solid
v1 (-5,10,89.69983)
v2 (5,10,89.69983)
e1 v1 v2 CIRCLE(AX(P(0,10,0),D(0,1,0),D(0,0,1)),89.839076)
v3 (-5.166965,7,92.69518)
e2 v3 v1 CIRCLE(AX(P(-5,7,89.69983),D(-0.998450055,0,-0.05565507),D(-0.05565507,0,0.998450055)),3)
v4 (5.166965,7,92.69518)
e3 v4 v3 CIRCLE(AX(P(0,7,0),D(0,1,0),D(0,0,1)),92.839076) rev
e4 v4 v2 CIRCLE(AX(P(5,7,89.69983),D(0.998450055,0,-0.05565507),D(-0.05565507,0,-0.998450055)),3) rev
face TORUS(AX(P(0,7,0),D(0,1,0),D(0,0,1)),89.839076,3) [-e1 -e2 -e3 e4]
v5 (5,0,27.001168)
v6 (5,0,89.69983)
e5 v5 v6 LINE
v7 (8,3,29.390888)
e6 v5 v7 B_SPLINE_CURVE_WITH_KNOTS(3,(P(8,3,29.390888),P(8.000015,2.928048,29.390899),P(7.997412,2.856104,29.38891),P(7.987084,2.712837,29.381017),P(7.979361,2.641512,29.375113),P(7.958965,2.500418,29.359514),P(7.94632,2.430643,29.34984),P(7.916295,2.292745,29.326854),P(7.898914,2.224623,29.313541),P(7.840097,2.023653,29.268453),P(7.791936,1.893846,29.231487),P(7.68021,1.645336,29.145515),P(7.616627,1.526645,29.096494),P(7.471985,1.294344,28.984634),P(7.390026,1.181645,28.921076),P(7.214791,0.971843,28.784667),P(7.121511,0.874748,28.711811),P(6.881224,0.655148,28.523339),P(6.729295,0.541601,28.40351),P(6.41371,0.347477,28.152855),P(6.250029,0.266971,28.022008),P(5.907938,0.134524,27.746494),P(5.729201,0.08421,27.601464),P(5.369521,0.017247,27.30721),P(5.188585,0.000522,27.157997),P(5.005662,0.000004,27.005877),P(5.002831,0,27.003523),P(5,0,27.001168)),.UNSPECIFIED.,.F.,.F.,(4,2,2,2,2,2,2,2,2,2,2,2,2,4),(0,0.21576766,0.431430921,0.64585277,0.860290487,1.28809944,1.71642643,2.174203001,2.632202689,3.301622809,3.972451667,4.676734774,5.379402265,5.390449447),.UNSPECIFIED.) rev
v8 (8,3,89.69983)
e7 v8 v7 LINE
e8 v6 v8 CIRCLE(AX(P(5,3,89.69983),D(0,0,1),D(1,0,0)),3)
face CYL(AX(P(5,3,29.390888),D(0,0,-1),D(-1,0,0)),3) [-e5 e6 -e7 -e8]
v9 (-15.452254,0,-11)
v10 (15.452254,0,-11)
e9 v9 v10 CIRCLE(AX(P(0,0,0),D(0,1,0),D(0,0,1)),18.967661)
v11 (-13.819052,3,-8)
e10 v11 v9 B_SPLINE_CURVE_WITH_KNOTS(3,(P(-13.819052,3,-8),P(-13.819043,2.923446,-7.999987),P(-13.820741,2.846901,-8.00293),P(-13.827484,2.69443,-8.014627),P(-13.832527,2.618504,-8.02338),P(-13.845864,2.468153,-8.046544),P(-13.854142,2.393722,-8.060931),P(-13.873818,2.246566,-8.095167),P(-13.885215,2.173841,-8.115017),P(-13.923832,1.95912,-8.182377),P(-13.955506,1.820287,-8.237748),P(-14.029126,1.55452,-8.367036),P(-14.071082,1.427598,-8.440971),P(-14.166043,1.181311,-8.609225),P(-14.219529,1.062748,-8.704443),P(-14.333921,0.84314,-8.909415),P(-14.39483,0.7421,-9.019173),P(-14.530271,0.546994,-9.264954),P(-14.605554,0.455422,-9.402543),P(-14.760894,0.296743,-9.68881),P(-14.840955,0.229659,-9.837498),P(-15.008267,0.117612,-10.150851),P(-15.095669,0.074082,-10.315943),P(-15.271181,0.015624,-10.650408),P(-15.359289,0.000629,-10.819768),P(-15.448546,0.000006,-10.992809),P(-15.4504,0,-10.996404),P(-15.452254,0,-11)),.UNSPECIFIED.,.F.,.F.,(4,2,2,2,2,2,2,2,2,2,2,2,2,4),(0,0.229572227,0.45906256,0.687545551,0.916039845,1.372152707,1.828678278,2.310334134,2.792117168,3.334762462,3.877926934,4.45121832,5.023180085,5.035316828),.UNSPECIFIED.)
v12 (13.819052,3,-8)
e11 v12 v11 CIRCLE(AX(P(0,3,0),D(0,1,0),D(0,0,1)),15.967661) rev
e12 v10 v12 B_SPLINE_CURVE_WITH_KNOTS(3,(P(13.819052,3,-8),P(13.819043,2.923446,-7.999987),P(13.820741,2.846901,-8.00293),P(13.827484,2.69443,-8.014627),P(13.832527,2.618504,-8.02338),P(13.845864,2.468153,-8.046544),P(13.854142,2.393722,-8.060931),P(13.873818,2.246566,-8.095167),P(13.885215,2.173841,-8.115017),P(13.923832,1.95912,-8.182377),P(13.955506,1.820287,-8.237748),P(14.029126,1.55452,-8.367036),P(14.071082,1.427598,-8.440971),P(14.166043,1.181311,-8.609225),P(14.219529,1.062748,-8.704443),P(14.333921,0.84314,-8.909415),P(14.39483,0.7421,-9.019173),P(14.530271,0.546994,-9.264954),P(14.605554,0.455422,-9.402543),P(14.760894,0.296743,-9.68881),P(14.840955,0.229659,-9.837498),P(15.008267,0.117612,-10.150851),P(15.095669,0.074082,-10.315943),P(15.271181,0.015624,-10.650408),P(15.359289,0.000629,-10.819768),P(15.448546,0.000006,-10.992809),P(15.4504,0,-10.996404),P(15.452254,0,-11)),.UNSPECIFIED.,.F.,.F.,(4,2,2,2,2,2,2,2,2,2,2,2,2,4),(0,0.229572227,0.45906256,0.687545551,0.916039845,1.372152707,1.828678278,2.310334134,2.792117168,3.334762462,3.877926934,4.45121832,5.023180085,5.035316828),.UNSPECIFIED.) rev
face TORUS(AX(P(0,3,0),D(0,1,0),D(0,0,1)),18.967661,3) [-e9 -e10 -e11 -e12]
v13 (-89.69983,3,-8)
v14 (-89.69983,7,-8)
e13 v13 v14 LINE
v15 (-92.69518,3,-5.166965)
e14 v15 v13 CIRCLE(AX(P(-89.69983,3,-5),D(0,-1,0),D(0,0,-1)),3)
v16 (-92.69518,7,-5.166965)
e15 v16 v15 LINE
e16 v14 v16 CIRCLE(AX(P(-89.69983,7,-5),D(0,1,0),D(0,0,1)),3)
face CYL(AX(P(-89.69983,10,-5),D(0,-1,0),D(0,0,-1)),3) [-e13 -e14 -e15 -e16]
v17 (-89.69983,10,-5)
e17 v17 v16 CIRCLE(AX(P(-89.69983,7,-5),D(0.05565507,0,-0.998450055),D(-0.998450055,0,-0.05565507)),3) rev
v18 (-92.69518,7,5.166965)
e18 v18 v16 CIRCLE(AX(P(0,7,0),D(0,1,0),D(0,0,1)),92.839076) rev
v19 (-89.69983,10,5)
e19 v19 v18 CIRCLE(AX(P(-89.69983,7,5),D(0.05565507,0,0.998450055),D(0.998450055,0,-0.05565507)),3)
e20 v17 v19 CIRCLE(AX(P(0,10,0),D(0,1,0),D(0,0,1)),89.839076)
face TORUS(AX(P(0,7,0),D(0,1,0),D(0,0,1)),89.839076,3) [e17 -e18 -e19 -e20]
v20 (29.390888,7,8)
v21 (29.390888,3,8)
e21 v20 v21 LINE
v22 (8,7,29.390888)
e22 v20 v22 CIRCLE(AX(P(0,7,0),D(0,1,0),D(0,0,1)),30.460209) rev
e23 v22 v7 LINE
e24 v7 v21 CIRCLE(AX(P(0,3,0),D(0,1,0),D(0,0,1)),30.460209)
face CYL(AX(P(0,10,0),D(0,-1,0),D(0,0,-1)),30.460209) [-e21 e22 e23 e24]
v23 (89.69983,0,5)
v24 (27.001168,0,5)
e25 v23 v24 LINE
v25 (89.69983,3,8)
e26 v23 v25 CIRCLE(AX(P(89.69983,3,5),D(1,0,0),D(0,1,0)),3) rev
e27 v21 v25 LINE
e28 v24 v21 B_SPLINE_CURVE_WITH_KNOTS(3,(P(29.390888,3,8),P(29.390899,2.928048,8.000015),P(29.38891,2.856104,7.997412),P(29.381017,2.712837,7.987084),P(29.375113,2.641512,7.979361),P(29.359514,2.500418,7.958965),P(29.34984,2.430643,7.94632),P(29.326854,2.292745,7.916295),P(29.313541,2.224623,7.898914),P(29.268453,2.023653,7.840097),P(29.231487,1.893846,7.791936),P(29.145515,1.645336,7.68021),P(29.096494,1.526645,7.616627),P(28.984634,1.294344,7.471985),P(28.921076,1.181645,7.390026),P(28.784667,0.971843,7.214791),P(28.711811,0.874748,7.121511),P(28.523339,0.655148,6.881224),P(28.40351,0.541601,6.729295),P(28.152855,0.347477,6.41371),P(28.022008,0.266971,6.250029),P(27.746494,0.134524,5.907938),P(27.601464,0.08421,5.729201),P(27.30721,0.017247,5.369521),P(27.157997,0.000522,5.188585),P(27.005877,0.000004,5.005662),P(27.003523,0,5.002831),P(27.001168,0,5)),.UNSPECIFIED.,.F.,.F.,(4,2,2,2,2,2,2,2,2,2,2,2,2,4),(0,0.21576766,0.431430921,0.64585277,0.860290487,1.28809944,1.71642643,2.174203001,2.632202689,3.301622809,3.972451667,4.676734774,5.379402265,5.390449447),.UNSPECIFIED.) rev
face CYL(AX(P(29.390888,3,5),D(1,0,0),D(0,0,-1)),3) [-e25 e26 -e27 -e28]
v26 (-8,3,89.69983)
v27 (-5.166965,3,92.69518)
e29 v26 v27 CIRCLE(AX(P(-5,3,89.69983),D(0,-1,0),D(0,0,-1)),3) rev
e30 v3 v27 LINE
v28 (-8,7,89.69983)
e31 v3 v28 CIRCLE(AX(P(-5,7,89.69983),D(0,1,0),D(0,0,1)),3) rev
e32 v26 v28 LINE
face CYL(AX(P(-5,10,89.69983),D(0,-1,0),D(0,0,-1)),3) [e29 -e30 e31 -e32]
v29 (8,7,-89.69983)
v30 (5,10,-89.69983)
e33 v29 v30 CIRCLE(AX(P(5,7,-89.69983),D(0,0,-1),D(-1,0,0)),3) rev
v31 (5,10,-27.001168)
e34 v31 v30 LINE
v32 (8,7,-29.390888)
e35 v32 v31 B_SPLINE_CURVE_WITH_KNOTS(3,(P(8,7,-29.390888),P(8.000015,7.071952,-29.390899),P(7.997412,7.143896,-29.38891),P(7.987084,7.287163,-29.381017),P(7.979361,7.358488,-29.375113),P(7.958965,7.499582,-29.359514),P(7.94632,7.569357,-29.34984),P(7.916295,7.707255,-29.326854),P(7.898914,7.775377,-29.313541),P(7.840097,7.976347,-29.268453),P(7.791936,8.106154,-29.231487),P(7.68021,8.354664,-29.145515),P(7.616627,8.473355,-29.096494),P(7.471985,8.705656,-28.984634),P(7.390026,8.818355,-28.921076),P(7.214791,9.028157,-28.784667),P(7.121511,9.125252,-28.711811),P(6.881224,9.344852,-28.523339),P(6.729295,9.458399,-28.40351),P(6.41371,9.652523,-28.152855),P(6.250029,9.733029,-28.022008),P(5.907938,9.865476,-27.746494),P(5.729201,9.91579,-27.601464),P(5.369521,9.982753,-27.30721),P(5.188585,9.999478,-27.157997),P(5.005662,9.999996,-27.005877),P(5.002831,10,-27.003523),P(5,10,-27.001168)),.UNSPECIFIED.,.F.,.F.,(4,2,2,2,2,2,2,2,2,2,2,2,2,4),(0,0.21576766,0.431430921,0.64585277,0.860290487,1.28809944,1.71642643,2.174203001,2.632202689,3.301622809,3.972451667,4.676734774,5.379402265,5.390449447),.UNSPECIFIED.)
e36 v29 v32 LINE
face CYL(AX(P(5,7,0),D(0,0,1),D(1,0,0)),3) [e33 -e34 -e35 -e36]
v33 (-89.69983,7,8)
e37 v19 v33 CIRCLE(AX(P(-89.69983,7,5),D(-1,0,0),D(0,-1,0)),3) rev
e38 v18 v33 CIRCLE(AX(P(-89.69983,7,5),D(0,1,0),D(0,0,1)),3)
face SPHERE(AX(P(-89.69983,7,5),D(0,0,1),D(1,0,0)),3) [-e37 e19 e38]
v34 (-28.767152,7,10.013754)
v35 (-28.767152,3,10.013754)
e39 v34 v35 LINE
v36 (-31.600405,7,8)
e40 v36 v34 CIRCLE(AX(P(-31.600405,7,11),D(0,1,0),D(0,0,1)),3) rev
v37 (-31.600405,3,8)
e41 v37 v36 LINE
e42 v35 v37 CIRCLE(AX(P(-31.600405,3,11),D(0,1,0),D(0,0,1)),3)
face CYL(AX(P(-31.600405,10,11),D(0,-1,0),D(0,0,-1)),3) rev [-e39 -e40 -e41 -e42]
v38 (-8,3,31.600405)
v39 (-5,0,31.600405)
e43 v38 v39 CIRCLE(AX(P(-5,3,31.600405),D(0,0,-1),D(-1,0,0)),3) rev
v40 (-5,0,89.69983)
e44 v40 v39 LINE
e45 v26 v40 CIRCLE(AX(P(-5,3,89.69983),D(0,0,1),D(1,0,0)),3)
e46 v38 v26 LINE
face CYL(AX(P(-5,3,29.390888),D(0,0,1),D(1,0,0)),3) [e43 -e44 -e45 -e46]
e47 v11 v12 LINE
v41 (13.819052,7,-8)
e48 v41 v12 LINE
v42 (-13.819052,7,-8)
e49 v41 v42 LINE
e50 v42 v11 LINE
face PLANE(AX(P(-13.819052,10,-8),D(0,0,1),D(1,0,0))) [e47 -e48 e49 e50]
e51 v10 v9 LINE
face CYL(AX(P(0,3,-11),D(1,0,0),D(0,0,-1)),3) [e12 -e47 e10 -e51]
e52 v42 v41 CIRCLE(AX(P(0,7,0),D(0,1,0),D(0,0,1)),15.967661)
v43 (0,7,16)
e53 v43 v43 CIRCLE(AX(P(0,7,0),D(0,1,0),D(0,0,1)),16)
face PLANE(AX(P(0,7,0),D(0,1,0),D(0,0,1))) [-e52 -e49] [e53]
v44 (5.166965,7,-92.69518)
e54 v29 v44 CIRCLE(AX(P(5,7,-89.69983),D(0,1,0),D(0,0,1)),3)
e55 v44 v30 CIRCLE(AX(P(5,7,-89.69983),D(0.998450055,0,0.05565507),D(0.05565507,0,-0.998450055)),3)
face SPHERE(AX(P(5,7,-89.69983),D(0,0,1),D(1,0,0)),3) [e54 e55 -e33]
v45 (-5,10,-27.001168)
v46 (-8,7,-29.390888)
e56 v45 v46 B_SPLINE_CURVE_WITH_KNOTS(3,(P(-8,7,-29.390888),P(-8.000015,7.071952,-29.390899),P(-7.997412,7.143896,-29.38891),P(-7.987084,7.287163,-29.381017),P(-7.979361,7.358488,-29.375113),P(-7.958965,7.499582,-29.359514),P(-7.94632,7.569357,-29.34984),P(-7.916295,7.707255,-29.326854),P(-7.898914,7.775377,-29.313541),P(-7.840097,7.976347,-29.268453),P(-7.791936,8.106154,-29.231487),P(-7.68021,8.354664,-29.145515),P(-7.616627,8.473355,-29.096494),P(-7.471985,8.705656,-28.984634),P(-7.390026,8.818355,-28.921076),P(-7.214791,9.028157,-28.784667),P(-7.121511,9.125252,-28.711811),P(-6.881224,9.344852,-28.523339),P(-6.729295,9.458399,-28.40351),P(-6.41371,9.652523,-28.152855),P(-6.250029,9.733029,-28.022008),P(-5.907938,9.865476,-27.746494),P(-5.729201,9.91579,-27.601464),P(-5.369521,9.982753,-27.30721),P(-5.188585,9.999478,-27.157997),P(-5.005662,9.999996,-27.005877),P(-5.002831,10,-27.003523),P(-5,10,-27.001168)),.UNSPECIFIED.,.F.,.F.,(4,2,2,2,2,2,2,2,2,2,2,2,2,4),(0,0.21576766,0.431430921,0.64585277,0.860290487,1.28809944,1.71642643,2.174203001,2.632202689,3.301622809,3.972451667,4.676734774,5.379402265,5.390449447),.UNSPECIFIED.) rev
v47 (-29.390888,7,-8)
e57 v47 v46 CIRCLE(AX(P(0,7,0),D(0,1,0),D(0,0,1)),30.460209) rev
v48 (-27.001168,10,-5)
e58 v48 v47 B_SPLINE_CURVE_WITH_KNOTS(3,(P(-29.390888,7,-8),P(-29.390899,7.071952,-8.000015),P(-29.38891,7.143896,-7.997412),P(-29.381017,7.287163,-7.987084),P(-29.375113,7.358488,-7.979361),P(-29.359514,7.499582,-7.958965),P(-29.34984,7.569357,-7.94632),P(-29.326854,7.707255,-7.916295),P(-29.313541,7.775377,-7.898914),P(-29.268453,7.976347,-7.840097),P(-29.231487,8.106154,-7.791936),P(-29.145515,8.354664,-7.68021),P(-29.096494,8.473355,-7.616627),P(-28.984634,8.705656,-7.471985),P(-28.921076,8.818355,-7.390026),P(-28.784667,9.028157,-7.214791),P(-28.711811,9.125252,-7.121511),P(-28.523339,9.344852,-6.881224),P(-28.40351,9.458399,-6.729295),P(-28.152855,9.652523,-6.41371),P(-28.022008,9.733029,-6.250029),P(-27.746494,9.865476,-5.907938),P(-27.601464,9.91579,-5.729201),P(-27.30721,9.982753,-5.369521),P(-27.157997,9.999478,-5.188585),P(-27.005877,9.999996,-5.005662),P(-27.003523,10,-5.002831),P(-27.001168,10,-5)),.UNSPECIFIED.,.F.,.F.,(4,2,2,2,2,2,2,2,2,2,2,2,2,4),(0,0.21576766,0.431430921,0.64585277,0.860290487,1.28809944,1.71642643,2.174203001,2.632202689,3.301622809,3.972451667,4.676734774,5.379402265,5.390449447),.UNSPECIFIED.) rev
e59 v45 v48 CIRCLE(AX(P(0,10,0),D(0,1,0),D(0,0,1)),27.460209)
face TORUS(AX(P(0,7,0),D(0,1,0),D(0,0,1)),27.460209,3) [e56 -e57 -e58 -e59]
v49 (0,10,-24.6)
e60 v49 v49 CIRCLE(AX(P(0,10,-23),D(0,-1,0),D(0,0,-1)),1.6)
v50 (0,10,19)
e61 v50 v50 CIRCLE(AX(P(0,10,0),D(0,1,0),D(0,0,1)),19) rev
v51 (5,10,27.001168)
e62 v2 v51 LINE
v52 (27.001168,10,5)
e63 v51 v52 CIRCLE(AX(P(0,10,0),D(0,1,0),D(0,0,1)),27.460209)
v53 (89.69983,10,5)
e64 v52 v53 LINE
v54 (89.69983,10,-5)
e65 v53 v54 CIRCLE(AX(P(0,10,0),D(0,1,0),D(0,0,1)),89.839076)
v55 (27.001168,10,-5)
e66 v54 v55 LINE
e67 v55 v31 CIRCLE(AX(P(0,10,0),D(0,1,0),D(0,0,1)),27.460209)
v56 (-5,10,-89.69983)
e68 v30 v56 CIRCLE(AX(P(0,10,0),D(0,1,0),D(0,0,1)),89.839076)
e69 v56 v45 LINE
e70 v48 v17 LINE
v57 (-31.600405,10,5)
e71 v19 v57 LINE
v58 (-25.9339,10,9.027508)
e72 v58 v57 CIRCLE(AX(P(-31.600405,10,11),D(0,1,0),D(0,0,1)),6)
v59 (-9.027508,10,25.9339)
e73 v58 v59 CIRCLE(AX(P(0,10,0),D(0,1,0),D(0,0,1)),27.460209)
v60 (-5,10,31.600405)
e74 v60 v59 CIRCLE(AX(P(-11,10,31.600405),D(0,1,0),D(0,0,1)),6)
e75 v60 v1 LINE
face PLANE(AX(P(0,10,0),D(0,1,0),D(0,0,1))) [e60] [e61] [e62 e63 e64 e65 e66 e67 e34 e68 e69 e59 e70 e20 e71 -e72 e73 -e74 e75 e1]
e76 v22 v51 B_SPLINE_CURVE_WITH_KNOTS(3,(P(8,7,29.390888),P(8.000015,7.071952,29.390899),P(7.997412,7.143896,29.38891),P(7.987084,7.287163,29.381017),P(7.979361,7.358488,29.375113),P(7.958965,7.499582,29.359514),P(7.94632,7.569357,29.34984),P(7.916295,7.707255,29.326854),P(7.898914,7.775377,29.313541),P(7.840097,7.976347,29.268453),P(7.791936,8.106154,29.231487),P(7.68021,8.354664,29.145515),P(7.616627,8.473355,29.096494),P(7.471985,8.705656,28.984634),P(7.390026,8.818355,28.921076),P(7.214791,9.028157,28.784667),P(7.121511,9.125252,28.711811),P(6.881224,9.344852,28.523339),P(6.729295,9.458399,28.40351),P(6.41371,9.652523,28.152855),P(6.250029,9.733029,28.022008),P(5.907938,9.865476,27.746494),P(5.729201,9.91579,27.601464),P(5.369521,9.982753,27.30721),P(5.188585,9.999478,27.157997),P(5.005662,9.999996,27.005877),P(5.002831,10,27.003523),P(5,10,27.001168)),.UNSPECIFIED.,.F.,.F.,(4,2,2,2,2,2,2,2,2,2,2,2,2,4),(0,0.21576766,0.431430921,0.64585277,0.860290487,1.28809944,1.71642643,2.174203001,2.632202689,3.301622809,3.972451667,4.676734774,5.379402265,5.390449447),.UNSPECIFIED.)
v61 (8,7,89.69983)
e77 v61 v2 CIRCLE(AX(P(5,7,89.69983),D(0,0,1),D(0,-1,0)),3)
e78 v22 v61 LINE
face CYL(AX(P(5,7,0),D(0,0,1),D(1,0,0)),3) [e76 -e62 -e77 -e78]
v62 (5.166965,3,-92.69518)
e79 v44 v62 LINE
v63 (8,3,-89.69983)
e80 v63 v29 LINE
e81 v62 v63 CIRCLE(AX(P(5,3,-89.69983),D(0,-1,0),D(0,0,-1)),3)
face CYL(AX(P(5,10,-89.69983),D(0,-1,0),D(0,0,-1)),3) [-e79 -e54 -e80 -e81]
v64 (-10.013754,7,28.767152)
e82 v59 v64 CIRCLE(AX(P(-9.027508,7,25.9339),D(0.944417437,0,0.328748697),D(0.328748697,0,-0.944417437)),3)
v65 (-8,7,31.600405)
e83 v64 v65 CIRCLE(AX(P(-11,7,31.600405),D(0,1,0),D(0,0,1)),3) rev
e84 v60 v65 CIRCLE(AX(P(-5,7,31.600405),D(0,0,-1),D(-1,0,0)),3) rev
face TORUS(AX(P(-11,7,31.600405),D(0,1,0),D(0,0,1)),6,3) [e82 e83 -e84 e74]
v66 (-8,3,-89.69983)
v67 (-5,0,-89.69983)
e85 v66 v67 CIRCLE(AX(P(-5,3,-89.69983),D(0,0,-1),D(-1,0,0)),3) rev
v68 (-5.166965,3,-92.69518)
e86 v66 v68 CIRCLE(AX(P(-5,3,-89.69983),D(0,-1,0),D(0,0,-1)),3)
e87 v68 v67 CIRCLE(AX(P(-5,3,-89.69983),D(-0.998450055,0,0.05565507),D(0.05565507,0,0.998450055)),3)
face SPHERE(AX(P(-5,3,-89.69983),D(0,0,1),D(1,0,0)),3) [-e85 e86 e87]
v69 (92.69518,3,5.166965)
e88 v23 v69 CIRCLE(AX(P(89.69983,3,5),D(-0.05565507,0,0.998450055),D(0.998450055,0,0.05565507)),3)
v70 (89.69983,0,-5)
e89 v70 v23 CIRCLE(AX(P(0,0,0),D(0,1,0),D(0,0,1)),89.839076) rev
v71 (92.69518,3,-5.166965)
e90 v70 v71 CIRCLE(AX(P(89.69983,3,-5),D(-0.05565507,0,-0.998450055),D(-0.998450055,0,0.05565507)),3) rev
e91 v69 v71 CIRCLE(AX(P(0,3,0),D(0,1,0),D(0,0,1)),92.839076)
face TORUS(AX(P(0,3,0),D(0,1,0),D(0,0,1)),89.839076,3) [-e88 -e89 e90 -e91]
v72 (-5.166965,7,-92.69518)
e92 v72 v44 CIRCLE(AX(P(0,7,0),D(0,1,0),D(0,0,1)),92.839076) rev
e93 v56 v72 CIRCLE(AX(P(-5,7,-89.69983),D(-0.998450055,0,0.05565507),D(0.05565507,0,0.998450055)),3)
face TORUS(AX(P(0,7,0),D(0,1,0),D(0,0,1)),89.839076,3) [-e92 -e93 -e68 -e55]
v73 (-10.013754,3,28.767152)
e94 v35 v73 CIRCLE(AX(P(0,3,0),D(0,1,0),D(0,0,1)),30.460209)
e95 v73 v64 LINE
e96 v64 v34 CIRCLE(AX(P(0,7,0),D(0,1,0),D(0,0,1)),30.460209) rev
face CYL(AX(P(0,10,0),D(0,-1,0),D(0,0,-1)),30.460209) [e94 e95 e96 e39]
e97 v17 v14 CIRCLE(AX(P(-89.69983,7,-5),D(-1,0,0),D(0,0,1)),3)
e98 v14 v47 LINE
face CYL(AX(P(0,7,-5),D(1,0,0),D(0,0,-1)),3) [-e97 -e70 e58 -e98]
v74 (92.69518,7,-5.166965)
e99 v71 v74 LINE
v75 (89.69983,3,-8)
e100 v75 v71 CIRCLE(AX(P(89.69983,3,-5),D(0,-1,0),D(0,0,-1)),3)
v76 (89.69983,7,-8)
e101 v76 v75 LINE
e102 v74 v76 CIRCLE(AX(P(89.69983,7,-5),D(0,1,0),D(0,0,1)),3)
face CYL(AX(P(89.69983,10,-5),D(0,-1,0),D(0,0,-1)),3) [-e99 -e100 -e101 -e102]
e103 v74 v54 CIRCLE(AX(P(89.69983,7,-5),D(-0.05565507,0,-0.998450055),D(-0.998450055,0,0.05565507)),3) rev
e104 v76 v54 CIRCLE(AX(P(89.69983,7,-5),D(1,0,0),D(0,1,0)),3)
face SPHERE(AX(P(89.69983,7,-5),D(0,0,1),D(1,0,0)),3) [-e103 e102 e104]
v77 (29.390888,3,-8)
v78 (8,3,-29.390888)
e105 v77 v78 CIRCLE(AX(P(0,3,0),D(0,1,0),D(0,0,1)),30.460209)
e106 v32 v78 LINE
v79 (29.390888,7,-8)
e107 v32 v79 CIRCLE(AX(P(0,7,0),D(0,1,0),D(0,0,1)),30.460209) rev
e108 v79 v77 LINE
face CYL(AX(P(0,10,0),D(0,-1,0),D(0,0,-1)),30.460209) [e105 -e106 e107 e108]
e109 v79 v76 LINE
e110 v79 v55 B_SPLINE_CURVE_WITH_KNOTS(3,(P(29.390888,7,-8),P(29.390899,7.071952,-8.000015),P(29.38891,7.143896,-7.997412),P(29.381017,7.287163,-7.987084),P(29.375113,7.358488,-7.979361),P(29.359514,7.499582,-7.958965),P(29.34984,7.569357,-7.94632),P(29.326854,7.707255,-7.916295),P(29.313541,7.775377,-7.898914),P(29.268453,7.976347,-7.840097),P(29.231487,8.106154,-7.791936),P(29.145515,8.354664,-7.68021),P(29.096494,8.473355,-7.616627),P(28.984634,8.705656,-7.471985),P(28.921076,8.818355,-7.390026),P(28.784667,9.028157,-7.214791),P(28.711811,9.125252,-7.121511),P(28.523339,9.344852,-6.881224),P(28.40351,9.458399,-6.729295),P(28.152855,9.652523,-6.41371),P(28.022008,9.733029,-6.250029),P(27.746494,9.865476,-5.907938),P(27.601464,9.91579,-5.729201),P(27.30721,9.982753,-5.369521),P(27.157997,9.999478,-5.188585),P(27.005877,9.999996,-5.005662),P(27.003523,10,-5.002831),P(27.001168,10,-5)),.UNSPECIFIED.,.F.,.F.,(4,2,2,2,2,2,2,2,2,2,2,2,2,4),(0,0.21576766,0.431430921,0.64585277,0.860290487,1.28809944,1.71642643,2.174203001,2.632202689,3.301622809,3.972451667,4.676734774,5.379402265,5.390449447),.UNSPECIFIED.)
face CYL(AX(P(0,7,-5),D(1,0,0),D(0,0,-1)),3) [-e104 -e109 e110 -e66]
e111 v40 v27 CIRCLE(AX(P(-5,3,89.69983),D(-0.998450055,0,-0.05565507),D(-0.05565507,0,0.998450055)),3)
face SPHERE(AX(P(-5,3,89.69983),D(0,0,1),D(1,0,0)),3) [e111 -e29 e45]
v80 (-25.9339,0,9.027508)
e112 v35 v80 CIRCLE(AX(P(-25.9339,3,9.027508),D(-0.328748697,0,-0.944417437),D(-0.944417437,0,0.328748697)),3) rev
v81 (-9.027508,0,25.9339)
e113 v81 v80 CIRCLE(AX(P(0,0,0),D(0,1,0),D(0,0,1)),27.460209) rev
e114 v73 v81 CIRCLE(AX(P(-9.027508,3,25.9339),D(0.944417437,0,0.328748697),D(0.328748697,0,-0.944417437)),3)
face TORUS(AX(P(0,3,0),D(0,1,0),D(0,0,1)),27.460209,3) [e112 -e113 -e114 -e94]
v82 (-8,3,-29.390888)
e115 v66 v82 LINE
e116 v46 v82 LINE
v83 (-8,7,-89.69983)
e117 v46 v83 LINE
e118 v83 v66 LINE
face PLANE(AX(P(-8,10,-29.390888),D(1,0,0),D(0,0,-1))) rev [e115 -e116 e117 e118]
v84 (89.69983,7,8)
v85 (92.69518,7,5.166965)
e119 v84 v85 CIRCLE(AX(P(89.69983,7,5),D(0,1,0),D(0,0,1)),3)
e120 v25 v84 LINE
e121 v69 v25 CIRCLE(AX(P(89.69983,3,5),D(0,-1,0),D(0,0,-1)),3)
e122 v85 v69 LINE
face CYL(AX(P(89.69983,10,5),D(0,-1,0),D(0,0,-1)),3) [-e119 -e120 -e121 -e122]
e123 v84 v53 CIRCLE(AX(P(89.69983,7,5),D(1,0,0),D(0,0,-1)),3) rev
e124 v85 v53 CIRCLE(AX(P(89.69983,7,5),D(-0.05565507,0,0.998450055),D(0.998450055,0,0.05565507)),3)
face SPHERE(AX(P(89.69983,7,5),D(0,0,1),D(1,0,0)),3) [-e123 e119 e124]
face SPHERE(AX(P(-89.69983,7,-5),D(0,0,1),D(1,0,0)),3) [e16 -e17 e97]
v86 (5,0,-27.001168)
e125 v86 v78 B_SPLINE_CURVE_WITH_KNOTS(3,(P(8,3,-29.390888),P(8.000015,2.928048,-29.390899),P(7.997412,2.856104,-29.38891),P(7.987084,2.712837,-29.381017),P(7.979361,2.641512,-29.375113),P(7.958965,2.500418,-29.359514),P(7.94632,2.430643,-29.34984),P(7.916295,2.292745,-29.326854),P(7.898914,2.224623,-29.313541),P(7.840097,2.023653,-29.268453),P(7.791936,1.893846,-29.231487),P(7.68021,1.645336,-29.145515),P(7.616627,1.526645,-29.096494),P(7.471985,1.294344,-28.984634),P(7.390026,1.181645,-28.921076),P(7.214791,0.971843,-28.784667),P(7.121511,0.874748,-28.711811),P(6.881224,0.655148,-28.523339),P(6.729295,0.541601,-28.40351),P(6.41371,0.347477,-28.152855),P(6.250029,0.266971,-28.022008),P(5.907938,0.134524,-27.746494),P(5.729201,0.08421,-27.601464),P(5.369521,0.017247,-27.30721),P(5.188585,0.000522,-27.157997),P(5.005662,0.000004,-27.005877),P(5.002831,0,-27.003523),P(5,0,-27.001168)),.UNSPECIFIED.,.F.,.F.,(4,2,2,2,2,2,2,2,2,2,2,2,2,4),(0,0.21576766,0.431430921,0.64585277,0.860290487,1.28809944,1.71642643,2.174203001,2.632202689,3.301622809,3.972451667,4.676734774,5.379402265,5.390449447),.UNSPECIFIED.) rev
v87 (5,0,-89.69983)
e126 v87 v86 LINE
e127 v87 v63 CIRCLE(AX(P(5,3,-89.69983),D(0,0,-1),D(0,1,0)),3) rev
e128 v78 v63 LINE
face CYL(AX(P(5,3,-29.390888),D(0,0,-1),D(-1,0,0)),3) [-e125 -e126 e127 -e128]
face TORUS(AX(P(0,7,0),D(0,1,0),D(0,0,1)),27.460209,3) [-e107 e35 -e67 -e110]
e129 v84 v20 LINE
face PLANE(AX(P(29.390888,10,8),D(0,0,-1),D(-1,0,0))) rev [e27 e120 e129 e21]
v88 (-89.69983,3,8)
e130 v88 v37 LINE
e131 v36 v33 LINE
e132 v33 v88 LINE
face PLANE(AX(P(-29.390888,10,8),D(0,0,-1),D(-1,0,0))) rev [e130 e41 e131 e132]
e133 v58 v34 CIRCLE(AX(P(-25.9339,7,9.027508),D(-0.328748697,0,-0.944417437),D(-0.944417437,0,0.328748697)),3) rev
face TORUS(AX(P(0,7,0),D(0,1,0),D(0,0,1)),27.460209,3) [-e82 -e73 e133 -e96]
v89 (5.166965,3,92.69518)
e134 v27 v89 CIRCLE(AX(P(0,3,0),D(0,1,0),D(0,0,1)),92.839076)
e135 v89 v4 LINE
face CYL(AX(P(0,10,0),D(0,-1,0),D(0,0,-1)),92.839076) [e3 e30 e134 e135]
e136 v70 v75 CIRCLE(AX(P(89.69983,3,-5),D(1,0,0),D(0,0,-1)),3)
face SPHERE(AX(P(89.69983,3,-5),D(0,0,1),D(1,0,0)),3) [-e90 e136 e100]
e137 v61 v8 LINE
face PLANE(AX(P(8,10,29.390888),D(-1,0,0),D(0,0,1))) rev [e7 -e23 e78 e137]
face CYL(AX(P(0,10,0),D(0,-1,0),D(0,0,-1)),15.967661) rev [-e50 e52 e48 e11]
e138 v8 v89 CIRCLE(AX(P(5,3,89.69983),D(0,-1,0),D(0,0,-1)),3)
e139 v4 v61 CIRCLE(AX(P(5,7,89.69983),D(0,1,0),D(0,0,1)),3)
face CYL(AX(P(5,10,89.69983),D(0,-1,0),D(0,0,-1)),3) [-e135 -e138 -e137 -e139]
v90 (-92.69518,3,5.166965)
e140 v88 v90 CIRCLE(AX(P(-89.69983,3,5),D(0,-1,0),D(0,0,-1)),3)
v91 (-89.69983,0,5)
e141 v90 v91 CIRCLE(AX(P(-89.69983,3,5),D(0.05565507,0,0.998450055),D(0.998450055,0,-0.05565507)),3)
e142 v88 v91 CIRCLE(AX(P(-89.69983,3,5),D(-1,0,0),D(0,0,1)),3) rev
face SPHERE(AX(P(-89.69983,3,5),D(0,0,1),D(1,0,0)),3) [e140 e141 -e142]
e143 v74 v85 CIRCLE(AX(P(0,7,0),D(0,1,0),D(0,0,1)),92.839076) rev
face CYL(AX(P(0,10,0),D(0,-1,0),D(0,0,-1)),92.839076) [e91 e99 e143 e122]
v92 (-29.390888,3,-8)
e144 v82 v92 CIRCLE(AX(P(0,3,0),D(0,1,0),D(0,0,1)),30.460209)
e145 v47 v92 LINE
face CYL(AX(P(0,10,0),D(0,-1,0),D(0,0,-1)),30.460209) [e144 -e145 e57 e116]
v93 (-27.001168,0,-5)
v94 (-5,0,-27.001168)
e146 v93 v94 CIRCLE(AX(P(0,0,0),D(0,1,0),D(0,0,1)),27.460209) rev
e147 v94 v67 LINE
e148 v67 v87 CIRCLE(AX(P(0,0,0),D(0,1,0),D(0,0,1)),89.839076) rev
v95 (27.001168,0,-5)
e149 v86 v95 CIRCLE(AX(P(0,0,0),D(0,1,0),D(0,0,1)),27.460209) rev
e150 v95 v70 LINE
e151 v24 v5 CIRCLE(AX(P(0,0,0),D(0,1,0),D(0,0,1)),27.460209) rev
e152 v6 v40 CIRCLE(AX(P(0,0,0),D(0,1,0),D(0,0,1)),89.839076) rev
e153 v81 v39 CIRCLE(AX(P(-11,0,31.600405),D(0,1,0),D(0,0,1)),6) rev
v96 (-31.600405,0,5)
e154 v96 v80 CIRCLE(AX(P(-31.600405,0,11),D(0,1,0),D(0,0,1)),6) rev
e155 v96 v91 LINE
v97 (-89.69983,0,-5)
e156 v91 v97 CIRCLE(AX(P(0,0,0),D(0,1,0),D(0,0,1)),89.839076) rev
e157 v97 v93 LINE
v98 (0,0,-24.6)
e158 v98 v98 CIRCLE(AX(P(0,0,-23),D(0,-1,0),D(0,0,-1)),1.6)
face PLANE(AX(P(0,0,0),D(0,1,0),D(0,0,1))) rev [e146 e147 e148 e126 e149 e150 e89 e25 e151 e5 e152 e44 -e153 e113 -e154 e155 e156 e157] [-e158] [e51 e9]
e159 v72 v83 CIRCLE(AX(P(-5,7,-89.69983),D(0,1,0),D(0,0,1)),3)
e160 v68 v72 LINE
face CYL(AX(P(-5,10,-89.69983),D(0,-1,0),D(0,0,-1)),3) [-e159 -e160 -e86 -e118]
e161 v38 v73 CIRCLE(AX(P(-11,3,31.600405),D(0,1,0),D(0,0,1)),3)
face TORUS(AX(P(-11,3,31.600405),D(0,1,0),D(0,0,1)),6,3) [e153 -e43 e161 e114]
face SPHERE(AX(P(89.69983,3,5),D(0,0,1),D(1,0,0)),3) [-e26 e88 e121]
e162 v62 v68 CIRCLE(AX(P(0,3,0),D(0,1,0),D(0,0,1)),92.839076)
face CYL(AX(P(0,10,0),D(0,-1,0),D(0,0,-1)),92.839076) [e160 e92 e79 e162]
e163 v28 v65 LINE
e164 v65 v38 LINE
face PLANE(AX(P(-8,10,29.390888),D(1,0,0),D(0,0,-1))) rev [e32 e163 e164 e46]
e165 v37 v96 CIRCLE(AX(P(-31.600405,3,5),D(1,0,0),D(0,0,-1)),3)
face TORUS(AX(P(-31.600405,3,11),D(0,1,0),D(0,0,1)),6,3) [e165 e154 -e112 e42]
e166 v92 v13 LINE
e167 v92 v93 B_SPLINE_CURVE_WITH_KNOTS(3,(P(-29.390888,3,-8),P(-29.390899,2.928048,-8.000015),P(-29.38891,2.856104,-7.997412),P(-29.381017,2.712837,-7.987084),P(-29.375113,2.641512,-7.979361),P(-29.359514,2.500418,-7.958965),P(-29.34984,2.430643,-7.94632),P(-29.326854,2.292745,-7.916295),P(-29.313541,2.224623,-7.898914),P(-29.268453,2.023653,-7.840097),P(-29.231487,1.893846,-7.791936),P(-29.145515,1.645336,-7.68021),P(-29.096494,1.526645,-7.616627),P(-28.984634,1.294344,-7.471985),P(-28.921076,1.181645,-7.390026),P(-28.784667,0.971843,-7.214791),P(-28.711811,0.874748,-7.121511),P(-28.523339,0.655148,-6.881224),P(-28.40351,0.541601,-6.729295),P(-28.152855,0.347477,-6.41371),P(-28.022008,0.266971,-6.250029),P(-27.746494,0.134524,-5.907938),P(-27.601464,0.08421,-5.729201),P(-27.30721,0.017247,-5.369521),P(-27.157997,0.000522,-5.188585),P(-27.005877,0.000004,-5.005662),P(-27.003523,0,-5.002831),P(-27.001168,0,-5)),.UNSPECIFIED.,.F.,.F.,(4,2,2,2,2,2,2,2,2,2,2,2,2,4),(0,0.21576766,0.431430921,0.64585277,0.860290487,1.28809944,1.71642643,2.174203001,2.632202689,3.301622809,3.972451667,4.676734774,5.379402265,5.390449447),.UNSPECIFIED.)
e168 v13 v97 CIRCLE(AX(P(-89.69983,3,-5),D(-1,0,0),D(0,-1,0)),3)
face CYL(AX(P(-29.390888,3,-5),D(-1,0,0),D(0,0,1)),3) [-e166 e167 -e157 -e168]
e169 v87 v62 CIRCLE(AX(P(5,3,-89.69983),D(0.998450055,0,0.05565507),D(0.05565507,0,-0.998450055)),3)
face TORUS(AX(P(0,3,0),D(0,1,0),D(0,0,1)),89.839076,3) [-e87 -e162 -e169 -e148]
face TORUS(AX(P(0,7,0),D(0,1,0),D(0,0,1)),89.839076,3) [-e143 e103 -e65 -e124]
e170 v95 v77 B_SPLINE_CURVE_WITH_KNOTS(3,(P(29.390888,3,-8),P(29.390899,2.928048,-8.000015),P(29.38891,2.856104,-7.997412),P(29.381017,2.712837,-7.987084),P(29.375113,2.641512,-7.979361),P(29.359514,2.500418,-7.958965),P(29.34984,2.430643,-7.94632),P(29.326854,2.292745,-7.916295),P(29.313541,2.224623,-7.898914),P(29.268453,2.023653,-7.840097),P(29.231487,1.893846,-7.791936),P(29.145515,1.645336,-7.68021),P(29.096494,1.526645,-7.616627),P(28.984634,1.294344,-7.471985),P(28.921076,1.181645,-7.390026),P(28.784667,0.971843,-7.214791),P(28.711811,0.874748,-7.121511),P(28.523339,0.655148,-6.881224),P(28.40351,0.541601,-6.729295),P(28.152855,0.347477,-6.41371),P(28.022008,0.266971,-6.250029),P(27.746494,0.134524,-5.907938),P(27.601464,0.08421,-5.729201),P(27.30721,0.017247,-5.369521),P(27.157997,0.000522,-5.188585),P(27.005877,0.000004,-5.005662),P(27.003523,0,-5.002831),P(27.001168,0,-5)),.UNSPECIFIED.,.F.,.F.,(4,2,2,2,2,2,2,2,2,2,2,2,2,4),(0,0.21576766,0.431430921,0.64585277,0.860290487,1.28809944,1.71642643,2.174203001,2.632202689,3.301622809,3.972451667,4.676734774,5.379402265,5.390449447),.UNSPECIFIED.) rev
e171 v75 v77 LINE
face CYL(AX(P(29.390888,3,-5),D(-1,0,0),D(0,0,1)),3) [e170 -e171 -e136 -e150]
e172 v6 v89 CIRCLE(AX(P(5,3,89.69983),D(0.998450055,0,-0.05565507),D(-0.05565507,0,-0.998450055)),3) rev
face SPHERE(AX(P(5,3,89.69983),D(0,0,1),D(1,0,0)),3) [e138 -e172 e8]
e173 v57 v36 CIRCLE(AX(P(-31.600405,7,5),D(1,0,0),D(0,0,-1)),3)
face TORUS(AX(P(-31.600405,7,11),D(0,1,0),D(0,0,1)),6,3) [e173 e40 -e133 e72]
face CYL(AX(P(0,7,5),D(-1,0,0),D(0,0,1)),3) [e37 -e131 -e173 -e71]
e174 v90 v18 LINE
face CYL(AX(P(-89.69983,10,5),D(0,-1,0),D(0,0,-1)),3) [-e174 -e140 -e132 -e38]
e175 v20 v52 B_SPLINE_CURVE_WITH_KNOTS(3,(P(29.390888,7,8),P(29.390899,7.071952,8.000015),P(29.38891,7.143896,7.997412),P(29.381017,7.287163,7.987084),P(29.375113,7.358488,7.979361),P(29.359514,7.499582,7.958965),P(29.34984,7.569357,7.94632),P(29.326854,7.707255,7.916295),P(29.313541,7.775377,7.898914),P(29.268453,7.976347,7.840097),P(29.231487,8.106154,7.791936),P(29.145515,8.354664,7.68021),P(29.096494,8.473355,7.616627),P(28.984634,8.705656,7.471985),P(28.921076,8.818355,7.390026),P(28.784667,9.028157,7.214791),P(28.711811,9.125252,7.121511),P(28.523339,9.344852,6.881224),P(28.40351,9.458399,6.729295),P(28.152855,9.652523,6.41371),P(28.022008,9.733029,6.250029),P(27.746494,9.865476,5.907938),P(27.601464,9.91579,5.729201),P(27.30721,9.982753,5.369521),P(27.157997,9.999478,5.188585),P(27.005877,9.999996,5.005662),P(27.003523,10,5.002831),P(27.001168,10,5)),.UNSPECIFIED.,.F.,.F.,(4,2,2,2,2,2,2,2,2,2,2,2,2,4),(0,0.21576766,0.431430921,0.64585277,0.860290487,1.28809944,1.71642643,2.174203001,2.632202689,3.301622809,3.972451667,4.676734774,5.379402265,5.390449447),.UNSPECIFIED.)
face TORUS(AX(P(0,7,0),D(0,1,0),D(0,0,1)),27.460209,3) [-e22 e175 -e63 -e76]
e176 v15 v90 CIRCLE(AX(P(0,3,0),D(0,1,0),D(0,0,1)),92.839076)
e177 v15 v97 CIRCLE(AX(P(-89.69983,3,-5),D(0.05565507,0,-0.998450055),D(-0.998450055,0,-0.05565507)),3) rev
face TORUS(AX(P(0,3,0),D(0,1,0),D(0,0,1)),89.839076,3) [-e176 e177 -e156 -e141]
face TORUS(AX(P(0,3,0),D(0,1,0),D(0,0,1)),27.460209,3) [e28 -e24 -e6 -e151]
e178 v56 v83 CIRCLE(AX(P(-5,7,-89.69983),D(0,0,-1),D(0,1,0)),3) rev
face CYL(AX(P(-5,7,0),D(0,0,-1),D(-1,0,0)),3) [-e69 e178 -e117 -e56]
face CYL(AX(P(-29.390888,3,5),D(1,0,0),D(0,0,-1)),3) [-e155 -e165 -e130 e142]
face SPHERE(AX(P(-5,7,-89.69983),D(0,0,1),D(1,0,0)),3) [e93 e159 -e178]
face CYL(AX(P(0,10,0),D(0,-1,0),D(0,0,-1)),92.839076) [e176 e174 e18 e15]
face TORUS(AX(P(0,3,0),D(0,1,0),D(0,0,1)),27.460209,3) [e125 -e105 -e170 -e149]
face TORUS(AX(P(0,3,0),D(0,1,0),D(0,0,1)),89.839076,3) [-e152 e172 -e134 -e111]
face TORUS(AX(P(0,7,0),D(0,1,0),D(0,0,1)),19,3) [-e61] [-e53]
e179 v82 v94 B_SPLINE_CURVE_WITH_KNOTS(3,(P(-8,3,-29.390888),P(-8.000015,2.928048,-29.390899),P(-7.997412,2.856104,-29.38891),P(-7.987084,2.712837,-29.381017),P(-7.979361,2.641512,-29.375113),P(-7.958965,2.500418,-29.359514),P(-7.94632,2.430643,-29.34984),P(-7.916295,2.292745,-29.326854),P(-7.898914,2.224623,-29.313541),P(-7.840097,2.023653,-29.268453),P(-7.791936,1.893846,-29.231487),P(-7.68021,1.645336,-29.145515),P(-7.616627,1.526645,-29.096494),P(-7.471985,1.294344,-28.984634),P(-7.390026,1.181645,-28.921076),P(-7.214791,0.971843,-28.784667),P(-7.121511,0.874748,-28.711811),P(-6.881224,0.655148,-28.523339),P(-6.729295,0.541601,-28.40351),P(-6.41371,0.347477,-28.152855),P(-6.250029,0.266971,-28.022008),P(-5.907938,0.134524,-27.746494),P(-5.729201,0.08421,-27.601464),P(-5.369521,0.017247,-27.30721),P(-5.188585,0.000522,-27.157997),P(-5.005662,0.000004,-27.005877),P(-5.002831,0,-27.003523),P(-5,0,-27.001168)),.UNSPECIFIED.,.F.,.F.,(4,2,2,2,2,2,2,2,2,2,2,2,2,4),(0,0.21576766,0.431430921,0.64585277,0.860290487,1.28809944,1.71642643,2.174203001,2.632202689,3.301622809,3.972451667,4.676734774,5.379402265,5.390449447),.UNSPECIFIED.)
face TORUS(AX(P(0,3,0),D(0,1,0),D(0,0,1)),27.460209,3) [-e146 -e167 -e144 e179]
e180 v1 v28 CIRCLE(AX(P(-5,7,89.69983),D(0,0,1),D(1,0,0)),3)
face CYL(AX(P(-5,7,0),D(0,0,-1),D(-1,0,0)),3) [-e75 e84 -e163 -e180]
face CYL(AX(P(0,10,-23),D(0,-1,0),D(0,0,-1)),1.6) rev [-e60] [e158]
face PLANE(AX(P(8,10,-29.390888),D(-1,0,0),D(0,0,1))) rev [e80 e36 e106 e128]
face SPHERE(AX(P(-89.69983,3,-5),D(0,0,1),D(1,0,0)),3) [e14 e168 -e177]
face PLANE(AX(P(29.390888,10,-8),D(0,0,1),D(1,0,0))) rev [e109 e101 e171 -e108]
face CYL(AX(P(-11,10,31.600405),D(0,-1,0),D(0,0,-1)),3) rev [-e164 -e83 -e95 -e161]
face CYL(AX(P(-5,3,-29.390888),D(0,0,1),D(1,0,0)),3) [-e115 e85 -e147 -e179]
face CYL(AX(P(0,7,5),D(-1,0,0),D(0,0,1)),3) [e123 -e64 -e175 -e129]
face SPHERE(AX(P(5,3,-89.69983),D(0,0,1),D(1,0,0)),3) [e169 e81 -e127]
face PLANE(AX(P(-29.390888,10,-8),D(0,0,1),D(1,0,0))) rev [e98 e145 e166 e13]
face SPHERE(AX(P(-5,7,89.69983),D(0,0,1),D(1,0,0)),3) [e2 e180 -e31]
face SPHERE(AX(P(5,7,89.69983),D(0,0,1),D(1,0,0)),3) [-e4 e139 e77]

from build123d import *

# Parameters (mm, degrees)
BOSS_EXTRUDE2_DEPTH = 10
SKETCH2_R           = 16
CUT_EXTRUDE1_DEPTH  = 3
FILLET4_R           = 3
SKETCH3_R           = 1.6
CUT_EXTRUDE2_DEPTH  = 132.67455319


with BuildPart() as part:
    # Sketch1 → Boss-Extrude2 (new body)
    with BuildSketch(Plane(origin=(0, 0, 0), x_dir=(1, 0, 0), z_dir=(0, 1, 0))):
        with BuildLine():
            Line((29.390888283, 8), (92.493750971, 8))
            ThreePointArc((92.493750971, 8), (92.839075656, 0), (92.493750971, -8))
            Line((92.493750971, -8), (29.390888283, -8))
            ThreePointArc((29.390888283, -8), (21.538620128, -21.538620128), (8, -29.390888283))
            Line((8, -29.390888283), (8, -92.493750971))
            ThreePointArc((8, -92.493750971), (0, -92.839075656), (-8, -92.493750971))
            Line((-8, -92.493750971), (-8, -29.390888283))
            ThreePointArc((-8, -29.390888283), (-21.538620128, -21.538620128), (-29.390888283, -8))
            Line((-29.390888283, -8), (-92.493750971, -8))
            ThreePointArc((-92.493750971, -8), (-92.839075656, 0), (-92.493750971, 8))
            Line((-92.493750971, 8), (-29.390888283, 8))
            ThreePointArc((-29.390888283, 8), (-21.538620128, 21.538620128), (-8, 29.390888283))
            Line((-8, 29.390888283), (-8, 92.493750971))
            ThreePointArc((-8, 92.493750971), (0, 92.839075656), (8, 92.493750971))
            Line((8, 92.493750971), (8, 29.390888283))
            ThreePointArc((8, 29.390888283), (21.538620128, 21.538620128), (29.390888283, 8))
        make_face()
        with BuildLine():
            Line((-13.819052056, 8), (13.819052056, 8))
            ThreePointArc((13.819052056, 8), (0, -15.96766106), (-13.819052056, 8))
        make_face(mode=Mode.SUBTRACT)
    extrude(amount=BOSS_EXTRUDE2_DEPTH)

    # Sketch2 → Cut-Extrude1 (cut)
    with BuildSketch(Plane(origin=(0, 10, 0), x_dir=(1, 0, 0), z_dir=(0, 1, 0))):
        with Locations(Location((0, 0, 0), (0, 0, 270))):
            Circle(SKETCH2_R)
    extrude(amount=-CUT_EXTRUDE1_DEPTH, mode=Mode.SUBTRACT)

    # Fillet4
    fillet4_edges = [part.edges().sort_by_distance(p)[0] for p in [
        (0, 10, -92.839075656),
        (-8, 10, -60.942319627),
        (60.942319627, 0, -8),
        (92.839075656, 0, 0),
        (60.942319627, 0, 8),
        (21.538620128, 0, 21.538620128),
        (8, 0, 60.942319627),
        (-21.538620128, 10, -21.538620128),
        (0, 0, 92.839075656),
        (-8, 0, 60.942319627),
        (-21.538620128, 0, 21.538620128),
        (-60.942319627, 0, 8),
        (-92.839075656, 0, 0),
        (-60.942319627, 0, -8),
        (-21.538620128, 0, -21.538620128),
        (-8, 0, -60.942319627),
        (-60.942319627, 10, -8),
        (0, 0, -92.839075656),
        (8, 0, -60.942319627),
        (21.538620128, 0, -21.538620128),
        (-92.839075656, 10, 0),
        (-60.942319627, 10, 8),
        (92.493750971, 5, -8),
        (92.493750971, 5, 8),
        (8, 5, 92.493750971),
        (-8, 5, 92.493750971),
        (-8, 5, 29.390888283),
        (-29.390888283, 5, 8),
        (-92.493750971, 5, 8),
        (-92.493750971, 5, -8),
        (-8, 5, -92.493750971),
        (8, 5, -92.493750971),
        (-21.538620128, 10, 21.538620128),
        (-8, 10, 60.942319627),
        (0, 10, 92.839075656),
        (8, 10, 60.942319627),
        (0, 0, 15.96766106),
        (21.538620128, 10, -21.538620128),
        (21.538620128, 10, 21.538620128),
        (0, 0, -8),
        (60.942319627, 10, 8),
        (92.839075656, 10, 0),
        (60.942319627, 10, -8),
        (0, 10, -16),
        (8, 10, -60.942319627),
    ]]
    fillet(fillet4_edges, radius=FILLET4_R - 0.0001)  # a hair under: the kernel refuses the full size

    # Sketch3 → Cut-Extrude2 (cut, through all)
    with BuildSketch(Plane(origin=(0, 0, 0), x_dir=(-1, 0, 0), z_dir=(0, -1, 0))):
        with Locations(Location((0, 23, 0), (0, 0, 90))):
            Circle(SKETCH3_R)
    extrude(amount=-CUT_EXTRUDE2_DEPTH, mode=Mode.SUBTRACT)


solid = part.part
